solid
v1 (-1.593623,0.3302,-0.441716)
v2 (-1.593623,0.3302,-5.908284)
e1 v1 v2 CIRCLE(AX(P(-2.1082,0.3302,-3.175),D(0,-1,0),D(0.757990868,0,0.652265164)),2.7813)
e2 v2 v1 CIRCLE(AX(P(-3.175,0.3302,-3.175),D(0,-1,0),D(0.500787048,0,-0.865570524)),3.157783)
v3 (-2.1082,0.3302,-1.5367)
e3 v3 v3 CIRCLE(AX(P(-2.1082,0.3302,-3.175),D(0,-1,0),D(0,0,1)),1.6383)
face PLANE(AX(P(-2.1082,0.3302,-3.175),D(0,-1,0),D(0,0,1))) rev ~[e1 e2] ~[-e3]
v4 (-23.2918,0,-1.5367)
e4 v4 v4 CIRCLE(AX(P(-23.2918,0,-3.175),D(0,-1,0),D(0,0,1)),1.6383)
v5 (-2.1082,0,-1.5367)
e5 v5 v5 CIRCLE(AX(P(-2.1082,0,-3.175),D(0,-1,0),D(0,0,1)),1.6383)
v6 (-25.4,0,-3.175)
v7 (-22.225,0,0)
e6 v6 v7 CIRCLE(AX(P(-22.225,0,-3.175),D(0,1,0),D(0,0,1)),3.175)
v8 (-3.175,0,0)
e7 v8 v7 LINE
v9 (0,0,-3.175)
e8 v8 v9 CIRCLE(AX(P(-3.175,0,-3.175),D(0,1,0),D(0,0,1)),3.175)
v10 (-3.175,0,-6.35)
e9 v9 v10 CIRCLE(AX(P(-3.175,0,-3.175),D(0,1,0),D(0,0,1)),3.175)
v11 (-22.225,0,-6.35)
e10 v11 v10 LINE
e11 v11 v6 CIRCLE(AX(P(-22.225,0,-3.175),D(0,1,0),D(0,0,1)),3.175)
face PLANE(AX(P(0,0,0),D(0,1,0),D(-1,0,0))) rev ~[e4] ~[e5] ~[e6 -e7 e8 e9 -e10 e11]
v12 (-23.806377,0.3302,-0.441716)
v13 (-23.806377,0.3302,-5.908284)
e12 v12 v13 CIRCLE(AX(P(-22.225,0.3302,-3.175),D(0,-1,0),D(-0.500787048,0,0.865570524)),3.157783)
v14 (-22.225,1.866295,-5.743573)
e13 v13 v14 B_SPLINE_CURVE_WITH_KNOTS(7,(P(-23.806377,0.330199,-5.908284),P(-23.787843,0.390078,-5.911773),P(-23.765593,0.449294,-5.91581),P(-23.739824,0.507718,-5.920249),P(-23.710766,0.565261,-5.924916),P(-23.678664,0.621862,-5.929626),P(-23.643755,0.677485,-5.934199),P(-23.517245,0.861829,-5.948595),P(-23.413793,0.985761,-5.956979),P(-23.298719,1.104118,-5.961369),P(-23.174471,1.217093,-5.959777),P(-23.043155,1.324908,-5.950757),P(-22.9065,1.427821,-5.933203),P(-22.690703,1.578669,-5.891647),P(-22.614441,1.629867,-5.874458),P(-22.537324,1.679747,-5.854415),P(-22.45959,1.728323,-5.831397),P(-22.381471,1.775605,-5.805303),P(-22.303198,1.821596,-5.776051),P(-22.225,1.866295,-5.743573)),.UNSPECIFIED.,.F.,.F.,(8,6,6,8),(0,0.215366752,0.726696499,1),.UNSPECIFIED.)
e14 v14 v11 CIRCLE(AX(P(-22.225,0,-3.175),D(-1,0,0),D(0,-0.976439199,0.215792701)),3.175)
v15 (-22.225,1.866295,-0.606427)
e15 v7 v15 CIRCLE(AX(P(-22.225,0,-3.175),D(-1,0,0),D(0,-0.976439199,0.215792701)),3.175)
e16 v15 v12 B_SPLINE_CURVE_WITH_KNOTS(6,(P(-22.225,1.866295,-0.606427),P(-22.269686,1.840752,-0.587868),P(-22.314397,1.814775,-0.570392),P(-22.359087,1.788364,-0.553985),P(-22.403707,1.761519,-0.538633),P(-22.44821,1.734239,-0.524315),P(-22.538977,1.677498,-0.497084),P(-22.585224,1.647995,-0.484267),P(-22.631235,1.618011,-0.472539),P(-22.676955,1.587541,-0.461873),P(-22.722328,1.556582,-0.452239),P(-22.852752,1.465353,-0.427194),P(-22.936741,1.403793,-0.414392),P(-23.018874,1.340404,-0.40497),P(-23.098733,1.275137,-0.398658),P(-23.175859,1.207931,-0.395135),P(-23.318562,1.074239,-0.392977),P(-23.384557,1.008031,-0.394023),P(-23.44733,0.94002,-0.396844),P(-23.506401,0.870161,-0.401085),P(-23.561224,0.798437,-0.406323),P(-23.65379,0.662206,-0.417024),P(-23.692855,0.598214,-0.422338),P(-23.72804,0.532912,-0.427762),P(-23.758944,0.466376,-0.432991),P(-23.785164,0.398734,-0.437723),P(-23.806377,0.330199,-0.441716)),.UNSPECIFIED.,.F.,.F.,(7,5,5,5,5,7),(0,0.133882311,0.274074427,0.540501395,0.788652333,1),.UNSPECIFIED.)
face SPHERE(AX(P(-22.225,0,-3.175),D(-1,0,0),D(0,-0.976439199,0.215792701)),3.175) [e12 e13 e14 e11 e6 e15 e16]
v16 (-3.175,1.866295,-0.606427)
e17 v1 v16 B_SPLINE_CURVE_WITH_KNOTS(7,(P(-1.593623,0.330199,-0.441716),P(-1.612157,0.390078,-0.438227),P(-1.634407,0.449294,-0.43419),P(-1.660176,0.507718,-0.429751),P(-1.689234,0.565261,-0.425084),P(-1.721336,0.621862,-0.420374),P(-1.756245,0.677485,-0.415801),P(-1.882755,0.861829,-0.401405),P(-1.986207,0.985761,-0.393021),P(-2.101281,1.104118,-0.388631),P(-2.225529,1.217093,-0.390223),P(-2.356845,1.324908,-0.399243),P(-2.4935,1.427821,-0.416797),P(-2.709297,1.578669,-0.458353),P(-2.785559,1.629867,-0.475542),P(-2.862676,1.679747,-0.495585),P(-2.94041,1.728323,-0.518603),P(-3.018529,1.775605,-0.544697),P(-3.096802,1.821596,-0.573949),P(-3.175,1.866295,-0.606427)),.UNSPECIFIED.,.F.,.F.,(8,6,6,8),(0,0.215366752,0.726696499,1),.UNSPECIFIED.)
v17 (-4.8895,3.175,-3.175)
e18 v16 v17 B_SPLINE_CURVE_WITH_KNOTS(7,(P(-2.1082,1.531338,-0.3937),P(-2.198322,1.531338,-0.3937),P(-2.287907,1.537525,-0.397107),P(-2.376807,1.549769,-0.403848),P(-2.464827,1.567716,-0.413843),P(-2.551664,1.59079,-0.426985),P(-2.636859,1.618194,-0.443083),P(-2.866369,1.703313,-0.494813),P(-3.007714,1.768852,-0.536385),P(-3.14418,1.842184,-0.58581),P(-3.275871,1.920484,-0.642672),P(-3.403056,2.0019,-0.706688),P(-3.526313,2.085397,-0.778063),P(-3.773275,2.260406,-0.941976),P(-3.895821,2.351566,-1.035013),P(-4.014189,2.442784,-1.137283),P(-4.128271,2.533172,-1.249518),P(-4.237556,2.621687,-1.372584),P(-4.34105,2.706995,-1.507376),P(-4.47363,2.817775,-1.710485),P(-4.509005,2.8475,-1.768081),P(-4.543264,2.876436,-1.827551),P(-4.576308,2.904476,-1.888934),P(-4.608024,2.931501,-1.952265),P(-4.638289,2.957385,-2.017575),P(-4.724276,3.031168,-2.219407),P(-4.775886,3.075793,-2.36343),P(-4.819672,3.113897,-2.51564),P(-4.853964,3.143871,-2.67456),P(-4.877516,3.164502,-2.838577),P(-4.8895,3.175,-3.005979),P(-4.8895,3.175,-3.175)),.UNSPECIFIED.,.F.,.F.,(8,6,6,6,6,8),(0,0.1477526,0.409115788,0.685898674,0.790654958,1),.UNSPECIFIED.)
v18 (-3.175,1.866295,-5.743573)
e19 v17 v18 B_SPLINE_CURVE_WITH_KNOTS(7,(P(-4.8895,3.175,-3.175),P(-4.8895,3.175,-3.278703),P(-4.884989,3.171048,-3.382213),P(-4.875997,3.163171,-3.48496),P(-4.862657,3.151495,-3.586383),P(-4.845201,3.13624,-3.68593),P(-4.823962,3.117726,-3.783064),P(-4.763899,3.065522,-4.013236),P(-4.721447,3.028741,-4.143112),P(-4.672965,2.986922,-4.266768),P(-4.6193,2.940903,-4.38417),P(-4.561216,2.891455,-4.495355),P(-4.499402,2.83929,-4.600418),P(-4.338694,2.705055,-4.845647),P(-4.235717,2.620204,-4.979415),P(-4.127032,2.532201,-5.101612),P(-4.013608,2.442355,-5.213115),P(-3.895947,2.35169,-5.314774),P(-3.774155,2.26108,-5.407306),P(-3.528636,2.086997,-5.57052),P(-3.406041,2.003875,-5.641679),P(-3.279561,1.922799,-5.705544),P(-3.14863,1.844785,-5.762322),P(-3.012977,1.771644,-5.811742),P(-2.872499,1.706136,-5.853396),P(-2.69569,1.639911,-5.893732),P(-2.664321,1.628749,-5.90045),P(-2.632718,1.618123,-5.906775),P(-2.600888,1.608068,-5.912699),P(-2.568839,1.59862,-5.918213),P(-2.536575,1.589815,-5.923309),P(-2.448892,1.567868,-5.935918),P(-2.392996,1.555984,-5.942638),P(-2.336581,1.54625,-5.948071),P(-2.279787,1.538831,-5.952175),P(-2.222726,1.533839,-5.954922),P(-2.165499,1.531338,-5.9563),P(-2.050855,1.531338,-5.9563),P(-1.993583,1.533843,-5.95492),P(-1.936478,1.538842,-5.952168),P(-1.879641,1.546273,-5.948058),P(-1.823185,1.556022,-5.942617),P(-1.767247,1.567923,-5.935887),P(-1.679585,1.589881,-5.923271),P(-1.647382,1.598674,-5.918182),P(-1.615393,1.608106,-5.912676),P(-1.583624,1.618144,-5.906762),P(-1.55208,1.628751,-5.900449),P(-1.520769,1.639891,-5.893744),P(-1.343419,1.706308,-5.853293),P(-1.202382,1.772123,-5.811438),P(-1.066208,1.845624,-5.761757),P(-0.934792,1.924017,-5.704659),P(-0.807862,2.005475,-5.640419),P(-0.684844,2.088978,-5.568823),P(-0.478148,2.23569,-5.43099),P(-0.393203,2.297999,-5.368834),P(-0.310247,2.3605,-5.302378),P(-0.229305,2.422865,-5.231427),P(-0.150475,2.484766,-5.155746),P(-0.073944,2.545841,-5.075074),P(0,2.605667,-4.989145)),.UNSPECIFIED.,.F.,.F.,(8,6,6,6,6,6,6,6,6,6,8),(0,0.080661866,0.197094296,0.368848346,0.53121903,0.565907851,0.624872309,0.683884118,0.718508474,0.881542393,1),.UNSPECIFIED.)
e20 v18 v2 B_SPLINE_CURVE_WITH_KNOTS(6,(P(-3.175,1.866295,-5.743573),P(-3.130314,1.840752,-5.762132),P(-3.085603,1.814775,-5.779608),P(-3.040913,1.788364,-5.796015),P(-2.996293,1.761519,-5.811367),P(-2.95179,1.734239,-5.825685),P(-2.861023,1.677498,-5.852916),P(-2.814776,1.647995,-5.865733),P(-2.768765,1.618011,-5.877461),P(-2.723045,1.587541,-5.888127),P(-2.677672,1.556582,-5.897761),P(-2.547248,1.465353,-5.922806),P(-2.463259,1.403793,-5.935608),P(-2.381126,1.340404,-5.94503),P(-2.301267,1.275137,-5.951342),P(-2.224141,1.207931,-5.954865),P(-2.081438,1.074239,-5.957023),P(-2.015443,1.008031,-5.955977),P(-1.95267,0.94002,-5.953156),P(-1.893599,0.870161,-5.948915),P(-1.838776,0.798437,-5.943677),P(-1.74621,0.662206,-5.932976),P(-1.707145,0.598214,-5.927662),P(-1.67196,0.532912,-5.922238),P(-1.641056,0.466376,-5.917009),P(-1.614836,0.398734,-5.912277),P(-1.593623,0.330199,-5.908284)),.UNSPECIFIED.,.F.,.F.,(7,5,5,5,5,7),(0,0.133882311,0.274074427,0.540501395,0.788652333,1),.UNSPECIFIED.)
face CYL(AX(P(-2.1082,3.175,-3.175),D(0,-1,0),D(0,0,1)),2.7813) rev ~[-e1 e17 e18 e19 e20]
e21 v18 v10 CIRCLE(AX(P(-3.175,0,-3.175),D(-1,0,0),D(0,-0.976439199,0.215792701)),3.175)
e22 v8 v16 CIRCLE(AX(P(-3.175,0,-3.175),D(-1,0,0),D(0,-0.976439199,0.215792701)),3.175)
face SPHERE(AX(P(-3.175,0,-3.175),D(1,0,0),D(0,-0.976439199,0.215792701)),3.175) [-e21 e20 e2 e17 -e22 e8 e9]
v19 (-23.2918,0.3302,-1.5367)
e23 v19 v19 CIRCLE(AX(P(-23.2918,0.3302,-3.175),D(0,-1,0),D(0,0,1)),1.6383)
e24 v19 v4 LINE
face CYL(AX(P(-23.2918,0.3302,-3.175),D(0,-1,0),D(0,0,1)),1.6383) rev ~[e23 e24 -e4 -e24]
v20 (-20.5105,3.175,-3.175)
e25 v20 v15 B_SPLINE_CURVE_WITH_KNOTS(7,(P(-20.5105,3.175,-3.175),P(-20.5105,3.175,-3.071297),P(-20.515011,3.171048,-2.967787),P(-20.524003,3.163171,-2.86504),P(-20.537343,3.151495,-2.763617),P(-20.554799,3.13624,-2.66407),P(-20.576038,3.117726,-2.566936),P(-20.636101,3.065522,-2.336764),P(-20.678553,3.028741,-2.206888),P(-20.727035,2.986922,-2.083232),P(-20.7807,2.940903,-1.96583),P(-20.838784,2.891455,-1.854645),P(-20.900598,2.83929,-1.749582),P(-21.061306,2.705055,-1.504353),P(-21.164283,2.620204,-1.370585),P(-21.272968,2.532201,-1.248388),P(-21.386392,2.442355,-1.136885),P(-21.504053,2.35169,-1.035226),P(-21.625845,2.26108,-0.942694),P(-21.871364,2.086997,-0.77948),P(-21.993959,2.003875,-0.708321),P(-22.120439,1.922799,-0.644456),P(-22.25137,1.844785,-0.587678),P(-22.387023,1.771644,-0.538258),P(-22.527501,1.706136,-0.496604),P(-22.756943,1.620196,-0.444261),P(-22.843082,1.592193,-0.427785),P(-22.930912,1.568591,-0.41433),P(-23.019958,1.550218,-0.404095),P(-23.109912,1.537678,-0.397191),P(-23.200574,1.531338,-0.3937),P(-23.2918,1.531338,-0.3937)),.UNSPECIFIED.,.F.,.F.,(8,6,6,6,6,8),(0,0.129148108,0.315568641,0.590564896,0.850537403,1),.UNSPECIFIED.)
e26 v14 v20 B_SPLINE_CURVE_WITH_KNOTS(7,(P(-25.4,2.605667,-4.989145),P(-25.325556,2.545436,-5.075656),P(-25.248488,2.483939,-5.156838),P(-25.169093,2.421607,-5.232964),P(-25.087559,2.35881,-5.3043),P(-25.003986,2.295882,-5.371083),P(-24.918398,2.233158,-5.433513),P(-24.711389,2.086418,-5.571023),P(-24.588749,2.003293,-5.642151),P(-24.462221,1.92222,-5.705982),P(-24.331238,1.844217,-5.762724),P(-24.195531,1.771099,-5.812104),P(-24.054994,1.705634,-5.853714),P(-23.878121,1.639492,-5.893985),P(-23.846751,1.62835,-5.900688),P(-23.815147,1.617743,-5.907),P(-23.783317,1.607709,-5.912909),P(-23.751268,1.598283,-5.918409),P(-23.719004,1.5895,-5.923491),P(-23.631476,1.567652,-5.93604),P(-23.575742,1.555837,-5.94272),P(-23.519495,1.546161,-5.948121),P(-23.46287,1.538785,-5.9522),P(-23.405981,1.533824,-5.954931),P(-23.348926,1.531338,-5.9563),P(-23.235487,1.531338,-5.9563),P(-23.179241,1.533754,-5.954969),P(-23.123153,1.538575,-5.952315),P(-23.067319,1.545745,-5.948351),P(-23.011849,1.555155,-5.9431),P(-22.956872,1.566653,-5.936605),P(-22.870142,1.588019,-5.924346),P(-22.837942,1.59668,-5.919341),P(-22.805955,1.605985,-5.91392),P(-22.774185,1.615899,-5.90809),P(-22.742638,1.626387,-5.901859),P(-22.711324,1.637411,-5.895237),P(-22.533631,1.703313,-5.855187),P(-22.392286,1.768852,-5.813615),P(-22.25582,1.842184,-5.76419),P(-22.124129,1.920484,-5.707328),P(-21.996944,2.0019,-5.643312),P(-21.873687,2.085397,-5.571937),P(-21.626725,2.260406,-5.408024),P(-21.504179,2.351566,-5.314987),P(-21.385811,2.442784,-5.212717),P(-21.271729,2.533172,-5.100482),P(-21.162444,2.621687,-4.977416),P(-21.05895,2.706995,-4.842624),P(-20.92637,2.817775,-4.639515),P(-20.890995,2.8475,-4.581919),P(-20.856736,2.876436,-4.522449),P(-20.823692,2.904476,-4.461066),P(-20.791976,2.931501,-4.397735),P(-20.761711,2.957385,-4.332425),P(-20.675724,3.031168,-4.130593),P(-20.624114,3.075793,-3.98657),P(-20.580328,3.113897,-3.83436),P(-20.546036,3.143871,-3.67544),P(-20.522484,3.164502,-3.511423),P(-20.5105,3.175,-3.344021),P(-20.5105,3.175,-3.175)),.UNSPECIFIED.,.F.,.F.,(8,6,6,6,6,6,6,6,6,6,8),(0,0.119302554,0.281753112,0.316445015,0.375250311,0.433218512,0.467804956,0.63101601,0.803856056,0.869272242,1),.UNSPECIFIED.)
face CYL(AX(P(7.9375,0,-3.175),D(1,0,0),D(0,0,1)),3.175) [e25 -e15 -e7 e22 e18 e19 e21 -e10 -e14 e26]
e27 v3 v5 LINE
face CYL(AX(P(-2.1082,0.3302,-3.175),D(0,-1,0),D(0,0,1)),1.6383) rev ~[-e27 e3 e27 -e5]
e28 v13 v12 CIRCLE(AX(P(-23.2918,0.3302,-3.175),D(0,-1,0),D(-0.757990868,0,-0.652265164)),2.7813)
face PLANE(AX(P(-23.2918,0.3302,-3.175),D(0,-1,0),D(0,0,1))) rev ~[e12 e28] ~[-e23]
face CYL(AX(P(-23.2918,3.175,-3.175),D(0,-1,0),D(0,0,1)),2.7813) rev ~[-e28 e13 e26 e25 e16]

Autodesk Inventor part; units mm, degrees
ref_plane "YZ Plane" through (0, 0, 0) normal (1, 0, 0) x (0, 1, 0)
ref_plane "XZ Plane" through (0, 0, 0) normal (0, 1, 0) x (-1, 0, 0)
ref_plane "XY Plane" through (0, 0, 0) normal (0, 0, 1) x (1, 0, 0)
sketch "Sketch1" plane through (0, 0, 0) normal (0, 1, 0) x (-1, 0, 0)
  line L0 (0, 0) -> (25.4, 0)
  line L1 (25.4, 0) -> (25.4, -6.35)
  line L2 (25.4, -6.35) -> (0, -6.35)
  line L3 (0, -6.35) -> (0, 0)
  dimension "d0" = 25.4
  dimension "d1" = 6.35
extrude "Extrusion1" add sketch "Sketch1" along normal blind 3.175
sketch "Sketch2" plane through (0, 3.175, 0) normal (0, 1, 0) x (1, 0, 0)
  line L0 (0, 0) -> (0, 6.35) projected
  line L1 (0, 3.175) -> (-2.1082, 3.175)
  line L2 (-25.4, 6.35) -> (-25.4, 0) projected
  line L3 (-25.4, 3.175) -> (-23.2918, 3.175)
  dimension "d4" = 2.1082
  dimension "d5" = 2.1082
hole "Hole1" at (-23.2918, 3.175, -3.175) at (-2.1082, 3.175, -3.175) direction (0, -1, 0) diameter 3.2766 depth 5.6896 counterbore diameter 5.5626 counterbore depth 2.8448 clearance for "Socket Head Cap Screw" size "#4" standard "Ansi Unified Screw Threads"
fillet "Fillet1" radius 3.175 6 edges at (-12.7, 3.175, 0) (-12.7, 3.175, -6.35) (-25.4, 3.175, -5.6696) (-25.4, 3.175, -0.6804) (0, 3.175, -5.6696) (0, 3.175, -0.6804)
fillet "Fillet2" radius 3.175 4 edges at (0, 1.4698, -5.9893) (0, 1.4698, -0.3607) (-25.4, 1.4698, -5.9893) (-25.4, 1.4698, -0.3607)
properties part number "Retention Clip - Whisper Valve Horizontal"
